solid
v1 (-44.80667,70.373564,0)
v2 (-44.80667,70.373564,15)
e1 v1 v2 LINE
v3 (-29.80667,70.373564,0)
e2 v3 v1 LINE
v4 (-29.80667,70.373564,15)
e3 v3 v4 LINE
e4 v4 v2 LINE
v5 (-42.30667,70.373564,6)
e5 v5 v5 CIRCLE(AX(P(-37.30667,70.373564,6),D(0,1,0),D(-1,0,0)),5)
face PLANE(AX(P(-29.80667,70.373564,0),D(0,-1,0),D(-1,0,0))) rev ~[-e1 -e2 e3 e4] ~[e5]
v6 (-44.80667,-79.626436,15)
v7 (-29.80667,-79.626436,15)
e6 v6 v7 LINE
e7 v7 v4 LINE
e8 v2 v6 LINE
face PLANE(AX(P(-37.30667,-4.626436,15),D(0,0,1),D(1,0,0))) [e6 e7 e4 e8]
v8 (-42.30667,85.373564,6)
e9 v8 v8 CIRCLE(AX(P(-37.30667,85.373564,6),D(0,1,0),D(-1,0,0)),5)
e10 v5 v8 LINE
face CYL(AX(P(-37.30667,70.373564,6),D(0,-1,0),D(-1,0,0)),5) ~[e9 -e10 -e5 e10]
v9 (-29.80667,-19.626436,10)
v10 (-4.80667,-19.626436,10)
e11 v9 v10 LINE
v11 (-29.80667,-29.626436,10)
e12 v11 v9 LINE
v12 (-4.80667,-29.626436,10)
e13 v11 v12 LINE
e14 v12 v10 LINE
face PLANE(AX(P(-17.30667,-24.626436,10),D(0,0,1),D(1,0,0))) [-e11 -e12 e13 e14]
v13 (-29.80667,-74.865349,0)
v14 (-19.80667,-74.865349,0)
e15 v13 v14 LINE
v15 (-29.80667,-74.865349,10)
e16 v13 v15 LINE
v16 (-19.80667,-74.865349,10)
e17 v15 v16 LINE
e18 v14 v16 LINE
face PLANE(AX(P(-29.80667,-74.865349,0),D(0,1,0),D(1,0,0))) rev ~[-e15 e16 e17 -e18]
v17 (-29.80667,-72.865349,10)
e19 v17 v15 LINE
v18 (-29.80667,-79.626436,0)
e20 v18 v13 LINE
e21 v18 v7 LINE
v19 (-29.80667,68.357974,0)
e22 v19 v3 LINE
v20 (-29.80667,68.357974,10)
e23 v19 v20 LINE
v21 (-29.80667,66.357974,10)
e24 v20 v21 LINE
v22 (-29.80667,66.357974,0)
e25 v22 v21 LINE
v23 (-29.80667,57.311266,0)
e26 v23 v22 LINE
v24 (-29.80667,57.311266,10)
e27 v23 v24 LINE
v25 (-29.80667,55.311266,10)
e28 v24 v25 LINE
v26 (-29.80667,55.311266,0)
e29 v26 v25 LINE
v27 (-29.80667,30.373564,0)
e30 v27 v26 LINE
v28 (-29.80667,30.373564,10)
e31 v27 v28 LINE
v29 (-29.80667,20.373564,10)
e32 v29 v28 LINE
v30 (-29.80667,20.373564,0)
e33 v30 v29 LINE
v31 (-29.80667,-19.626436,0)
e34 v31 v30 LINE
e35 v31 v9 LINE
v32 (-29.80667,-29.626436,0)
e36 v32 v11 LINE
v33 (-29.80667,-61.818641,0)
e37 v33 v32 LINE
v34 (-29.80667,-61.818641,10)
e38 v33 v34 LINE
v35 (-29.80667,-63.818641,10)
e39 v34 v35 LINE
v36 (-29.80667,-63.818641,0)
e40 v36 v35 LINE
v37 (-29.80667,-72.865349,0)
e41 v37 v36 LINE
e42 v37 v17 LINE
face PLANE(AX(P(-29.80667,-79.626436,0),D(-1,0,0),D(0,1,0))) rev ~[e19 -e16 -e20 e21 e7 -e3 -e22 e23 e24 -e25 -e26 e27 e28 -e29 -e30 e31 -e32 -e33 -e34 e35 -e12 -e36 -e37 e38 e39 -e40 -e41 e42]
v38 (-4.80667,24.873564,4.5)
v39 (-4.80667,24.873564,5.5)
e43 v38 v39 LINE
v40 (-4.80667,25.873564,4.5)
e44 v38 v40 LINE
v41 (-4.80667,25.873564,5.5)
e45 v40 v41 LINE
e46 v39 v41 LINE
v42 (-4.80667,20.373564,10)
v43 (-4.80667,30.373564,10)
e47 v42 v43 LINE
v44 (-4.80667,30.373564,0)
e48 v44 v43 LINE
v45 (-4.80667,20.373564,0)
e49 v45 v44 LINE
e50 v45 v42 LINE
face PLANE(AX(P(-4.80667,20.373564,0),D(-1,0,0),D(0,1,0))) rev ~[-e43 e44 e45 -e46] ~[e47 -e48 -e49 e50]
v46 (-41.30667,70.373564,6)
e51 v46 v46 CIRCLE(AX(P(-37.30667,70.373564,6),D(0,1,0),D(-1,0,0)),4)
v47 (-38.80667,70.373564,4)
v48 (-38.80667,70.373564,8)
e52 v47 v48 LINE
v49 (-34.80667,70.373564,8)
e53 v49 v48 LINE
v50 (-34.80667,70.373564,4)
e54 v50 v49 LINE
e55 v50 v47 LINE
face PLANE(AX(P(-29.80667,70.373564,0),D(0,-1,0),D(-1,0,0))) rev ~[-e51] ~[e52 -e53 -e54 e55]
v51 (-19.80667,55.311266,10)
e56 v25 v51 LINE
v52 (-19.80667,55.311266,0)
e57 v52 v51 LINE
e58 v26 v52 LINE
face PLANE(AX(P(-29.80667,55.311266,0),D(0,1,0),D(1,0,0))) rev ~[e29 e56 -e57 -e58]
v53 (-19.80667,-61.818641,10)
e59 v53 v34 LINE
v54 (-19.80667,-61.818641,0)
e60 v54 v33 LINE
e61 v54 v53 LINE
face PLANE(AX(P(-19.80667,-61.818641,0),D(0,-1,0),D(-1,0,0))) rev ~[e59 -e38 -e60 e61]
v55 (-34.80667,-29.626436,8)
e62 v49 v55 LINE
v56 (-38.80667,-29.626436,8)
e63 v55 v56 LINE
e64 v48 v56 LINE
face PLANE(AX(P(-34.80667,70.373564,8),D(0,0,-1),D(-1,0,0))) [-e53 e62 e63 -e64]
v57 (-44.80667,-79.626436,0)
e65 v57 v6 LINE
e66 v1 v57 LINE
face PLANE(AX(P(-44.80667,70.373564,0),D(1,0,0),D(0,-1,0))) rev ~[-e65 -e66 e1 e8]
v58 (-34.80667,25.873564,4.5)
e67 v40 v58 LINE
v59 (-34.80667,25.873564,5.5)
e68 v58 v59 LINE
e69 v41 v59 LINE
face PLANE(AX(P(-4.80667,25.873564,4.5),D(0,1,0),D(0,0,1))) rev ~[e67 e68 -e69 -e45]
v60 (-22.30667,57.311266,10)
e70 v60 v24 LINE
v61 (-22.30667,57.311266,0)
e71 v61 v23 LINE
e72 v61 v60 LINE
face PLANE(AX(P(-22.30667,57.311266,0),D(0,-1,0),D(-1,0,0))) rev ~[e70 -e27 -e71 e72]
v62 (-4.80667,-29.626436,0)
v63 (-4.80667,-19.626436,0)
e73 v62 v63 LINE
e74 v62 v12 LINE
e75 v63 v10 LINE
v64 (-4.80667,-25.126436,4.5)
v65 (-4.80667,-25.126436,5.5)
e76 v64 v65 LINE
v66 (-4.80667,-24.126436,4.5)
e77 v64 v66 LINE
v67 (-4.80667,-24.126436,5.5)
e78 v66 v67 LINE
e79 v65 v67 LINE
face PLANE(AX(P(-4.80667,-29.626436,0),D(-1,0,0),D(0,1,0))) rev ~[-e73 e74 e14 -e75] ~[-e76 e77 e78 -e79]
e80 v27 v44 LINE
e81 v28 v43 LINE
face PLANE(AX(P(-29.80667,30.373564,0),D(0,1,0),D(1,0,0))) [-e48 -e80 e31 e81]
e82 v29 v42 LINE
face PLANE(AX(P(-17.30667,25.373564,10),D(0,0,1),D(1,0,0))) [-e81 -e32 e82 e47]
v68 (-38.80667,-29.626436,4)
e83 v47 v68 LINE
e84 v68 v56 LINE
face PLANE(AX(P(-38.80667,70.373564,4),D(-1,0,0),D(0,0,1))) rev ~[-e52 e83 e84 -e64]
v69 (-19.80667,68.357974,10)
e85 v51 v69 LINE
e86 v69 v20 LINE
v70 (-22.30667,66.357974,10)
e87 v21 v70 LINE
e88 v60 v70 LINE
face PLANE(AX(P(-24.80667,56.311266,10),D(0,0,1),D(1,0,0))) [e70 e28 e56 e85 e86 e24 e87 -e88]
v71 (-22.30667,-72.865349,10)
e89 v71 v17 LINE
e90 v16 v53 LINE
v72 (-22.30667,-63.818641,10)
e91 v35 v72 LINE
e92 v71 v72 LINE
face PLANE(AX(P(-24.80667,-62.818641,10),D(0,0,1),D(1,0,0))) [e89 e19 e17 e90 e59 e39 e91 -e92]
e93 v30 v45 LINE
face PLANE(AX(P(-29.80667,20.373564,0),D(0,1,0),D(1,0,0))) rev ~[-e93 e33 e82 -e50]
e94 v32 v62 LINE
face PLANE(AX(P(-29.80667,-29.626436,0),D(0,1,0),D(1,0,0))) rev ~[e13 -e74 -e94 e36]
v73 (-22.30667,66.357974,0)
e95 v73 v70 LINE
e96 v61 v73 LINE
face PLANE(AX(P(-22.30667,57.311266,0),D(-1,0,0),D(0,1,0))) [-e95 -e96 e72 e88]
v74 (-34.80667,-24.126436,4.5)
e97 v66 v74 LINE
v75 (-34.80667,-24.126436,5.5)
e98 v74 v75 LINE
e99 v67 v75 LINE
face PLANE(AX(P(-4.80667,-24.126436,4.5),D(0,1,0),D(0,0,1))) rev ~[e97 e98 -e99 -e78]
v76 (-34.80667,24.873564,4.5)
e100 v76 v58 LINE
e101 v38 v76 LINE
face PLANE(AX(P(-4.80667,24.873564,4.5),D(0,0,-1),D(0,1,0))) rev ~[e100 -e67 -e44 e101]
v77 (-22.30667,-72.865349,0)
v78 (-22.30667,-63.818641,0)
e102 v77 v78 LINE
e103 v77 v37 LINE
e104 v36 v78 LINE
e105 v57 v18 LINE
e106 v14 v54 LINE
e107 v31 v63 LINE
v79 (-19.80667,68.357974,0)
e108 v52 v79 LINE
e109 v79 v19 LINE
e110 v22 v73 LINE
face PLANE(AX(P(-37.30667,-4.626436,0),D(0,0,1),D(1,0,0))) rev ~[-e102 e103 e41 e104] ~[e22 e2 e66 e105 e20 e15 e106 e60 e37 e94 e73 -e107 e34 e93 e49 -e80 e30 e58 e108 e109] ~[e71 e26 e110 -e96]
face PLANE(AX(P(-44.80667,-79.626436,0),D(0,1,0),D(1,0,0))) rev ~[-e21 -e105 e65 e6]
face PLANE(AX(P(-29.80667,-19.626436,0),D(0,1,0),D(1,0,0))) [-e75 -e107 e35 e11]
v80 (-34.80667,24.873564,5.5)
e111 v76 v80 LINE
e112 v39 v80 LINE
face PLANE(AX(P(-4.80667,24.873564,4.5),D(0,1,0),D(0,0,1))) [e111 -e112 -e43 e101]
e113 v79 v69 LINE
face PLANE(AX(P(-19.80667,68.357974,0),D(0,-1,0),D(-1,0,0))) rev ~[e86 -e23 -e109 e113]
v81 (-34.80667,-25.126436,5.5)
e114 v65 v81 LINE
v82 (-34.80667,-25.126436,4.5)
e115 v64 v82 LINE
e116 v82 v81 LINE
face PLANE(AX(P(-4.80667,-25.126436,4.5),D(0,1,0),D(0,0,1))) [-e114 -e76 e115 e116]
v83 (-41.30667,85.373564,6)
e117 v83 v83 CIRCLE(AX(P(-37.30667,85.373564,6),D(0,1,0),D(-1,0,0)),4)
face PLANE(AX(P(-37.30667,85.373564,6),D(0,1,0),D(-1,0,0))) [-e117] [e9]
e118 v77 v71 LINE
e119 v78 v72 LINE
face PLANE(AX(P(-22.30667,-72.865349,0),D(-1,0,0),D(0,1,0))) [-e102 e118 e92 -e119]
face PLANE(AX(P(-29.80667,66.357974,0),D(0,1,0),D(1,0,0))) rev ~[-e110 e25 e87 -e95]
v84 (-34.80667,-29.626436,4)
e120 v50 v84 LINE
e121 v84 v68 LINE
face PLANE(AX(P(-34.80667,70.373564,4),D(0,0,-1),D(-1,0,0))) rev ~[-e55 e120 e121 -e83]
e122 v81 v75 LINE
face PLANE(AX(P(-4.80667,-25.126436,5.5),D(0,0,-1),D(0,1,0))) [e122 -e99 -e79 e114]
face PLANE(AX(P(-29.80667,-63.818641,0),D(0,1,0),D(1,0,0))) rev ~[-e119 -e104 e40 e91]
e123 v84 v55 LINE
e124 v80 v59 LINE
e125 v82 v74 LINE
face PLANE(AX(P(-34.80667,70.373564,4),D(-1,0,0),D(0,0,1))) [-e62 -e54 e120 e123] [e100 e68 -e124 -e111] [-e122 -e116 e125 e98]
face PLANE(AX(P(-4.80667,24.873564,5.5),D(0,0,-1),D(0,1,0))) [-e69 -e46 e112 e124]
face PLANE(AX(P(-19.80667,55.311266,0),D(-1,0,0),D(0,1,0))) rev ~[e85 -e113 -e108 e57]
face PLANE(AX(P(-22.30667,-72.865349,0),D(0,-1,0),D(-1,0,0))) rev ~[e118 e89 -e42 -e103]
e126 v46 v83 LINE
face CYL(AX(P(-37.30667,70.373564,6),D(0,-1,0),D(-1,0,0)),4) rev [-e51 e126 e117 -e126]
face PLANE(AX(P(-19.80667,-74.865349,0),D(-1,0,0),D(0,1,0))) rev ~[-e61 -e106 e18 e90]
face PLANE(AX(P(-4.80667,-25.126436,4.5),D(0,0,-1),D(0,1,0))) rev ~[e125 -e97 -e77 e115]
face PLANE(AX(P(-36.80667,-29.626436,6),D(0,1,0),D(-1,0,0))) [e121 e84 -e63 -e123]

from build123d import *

# Parameters (mm, degrees)
F1_DEPTH = 15
F0_W     = 25
F0_H     = 10
F0_W_2   = 2.5
F0_H_2   = 9.0467076302
F2_DEPTH = 10
F3_W     = 4
F3_H     = 4
F4_DEPTH = 100
F6_W     = 1
F6_H     = 1
F5_W     = 1
F5_H     = 1
F7_DEPTH = 30
F8_R     = 5
F8_R_2   = 4
F9_DEPTH = 15


with BuildPart() as f1:
    # F0 (on Top) → F1 (new body)
    with BuildSketch(Plane.XY):
        Polygon((-29.806669808, 70.373563841), (-44.806669808, 70.373563841), (-44.806669808, -79.626436159), (-29.806669808, -79.626436159), (-29.806669808, -74.8653486371), (-29.806669808, -72.8653486371), (-29.806669808, -63.8186410069), (-29.806669808, -61.8186410069), (-29.806669808, -29.626436159), (-29.806669808, -19.626436159), (-29.806669808, 20.373563841), (-29.806669808, 30.373563841), (-29.806669808, 55.3112663329), (-29.806669808, 57.3112663329), (-29.806669808, 66.357973963), (-29.806669808, 68.357973963), align=None)
    extrude(amount=F1_DEPTH)

    # F0 (on Top) → F2 (join)
    with BuildSketch(Plane.XY):
        with Locations((-17.306669808, 25.373563841)):
            Rectangle(F0_W, F0_H)
        with Locations((-17.306669808, -24.626436159)):
            Rectangle(F0_W, F0_H)
        Polygon((-29.806669808, -61.8186410069), (-29.806669808, -63.8186410069), (-22.306669808, -63.8186410069), (-19.806669808, -63.8186410069), (-19.806669808, -61.8186410069), align=None)
        with Locations((-21.056669808, -68.341994822)):
            Rectangle(F0_W_2, F0_H_2)
        Polygon((-29.806669808, -72.8653486371), (-29.806669808, -74.8653486371), (-19.806669808, -74.8653486371), (-19.806669808, -72.8653486371), (-22.306669808, -72.8653486371), align=None)
        Polygon((-22.3066698015, 57.3112663329), (-29.8066698015, 57.3112663329), (-29.806669808, 55.3112663329), (-19.8066698015, 55.3112663329), (-19.8066698015, 57.3112663329), align=None)
        with Locations((-21.0566698015, 61.8346201479)):
            Rectangle(F0_W_2, F0_H_2)
        Polygon((-19.8066698015, 68.357973963), (-29.8066698015, 68.357973963), (-29.806669808, 66.357973963), (-22.3066698015, 66.357973963), (-19.8066698015, 66.357973963), align=None)
    extrude(amount=F2_DEPTH)

    # F3 (on face) → F4 (cut)
    with BuildSketch(Plane(origin=(0, 70.373563841, 0), x_dir=(-1, 0, 0), z_dir=(0, 1, 0))):
        with Locations((36.806669808, 6)):
            Rectangle(F3_W, F3_H)
    extrude(amount=-F4_DEPTH, mode=Mode.SUBTRACT)

    # F6 (on face) + F5 (on face) → F7 (cut)
    with BuildSketch(Plane.YZ.offset(-4.806669808)):
        with Locations((25.373563841, 5)):
            Rectangle(F6_W, F6_H)
    with BuildSketch(Plane.YZ.offset(-4.806669808)):
        with Locations((-24.626436159, 5)):
            Rectangle(F5_W, F5_H)
    extrude(amount=-F7_DEPTH, mode=Mode.SUBTRACT)

    # F8 (on face) → F9 (join)
    with BuildSketch(Plane(origin=(0, 70.373563841, 0), x_dir=(-1, 0, 0), z_dir=(0, 1, 0))):
        with Locations((37.306669808, 6)):
            Circle(F8_R)
        with Locations((37.306669808, 6)):
            Circle(F8_R_2, mode=Mode.SUBTRACT)
    extrude(amount=F9_DEPTH)


solid = f1.part
